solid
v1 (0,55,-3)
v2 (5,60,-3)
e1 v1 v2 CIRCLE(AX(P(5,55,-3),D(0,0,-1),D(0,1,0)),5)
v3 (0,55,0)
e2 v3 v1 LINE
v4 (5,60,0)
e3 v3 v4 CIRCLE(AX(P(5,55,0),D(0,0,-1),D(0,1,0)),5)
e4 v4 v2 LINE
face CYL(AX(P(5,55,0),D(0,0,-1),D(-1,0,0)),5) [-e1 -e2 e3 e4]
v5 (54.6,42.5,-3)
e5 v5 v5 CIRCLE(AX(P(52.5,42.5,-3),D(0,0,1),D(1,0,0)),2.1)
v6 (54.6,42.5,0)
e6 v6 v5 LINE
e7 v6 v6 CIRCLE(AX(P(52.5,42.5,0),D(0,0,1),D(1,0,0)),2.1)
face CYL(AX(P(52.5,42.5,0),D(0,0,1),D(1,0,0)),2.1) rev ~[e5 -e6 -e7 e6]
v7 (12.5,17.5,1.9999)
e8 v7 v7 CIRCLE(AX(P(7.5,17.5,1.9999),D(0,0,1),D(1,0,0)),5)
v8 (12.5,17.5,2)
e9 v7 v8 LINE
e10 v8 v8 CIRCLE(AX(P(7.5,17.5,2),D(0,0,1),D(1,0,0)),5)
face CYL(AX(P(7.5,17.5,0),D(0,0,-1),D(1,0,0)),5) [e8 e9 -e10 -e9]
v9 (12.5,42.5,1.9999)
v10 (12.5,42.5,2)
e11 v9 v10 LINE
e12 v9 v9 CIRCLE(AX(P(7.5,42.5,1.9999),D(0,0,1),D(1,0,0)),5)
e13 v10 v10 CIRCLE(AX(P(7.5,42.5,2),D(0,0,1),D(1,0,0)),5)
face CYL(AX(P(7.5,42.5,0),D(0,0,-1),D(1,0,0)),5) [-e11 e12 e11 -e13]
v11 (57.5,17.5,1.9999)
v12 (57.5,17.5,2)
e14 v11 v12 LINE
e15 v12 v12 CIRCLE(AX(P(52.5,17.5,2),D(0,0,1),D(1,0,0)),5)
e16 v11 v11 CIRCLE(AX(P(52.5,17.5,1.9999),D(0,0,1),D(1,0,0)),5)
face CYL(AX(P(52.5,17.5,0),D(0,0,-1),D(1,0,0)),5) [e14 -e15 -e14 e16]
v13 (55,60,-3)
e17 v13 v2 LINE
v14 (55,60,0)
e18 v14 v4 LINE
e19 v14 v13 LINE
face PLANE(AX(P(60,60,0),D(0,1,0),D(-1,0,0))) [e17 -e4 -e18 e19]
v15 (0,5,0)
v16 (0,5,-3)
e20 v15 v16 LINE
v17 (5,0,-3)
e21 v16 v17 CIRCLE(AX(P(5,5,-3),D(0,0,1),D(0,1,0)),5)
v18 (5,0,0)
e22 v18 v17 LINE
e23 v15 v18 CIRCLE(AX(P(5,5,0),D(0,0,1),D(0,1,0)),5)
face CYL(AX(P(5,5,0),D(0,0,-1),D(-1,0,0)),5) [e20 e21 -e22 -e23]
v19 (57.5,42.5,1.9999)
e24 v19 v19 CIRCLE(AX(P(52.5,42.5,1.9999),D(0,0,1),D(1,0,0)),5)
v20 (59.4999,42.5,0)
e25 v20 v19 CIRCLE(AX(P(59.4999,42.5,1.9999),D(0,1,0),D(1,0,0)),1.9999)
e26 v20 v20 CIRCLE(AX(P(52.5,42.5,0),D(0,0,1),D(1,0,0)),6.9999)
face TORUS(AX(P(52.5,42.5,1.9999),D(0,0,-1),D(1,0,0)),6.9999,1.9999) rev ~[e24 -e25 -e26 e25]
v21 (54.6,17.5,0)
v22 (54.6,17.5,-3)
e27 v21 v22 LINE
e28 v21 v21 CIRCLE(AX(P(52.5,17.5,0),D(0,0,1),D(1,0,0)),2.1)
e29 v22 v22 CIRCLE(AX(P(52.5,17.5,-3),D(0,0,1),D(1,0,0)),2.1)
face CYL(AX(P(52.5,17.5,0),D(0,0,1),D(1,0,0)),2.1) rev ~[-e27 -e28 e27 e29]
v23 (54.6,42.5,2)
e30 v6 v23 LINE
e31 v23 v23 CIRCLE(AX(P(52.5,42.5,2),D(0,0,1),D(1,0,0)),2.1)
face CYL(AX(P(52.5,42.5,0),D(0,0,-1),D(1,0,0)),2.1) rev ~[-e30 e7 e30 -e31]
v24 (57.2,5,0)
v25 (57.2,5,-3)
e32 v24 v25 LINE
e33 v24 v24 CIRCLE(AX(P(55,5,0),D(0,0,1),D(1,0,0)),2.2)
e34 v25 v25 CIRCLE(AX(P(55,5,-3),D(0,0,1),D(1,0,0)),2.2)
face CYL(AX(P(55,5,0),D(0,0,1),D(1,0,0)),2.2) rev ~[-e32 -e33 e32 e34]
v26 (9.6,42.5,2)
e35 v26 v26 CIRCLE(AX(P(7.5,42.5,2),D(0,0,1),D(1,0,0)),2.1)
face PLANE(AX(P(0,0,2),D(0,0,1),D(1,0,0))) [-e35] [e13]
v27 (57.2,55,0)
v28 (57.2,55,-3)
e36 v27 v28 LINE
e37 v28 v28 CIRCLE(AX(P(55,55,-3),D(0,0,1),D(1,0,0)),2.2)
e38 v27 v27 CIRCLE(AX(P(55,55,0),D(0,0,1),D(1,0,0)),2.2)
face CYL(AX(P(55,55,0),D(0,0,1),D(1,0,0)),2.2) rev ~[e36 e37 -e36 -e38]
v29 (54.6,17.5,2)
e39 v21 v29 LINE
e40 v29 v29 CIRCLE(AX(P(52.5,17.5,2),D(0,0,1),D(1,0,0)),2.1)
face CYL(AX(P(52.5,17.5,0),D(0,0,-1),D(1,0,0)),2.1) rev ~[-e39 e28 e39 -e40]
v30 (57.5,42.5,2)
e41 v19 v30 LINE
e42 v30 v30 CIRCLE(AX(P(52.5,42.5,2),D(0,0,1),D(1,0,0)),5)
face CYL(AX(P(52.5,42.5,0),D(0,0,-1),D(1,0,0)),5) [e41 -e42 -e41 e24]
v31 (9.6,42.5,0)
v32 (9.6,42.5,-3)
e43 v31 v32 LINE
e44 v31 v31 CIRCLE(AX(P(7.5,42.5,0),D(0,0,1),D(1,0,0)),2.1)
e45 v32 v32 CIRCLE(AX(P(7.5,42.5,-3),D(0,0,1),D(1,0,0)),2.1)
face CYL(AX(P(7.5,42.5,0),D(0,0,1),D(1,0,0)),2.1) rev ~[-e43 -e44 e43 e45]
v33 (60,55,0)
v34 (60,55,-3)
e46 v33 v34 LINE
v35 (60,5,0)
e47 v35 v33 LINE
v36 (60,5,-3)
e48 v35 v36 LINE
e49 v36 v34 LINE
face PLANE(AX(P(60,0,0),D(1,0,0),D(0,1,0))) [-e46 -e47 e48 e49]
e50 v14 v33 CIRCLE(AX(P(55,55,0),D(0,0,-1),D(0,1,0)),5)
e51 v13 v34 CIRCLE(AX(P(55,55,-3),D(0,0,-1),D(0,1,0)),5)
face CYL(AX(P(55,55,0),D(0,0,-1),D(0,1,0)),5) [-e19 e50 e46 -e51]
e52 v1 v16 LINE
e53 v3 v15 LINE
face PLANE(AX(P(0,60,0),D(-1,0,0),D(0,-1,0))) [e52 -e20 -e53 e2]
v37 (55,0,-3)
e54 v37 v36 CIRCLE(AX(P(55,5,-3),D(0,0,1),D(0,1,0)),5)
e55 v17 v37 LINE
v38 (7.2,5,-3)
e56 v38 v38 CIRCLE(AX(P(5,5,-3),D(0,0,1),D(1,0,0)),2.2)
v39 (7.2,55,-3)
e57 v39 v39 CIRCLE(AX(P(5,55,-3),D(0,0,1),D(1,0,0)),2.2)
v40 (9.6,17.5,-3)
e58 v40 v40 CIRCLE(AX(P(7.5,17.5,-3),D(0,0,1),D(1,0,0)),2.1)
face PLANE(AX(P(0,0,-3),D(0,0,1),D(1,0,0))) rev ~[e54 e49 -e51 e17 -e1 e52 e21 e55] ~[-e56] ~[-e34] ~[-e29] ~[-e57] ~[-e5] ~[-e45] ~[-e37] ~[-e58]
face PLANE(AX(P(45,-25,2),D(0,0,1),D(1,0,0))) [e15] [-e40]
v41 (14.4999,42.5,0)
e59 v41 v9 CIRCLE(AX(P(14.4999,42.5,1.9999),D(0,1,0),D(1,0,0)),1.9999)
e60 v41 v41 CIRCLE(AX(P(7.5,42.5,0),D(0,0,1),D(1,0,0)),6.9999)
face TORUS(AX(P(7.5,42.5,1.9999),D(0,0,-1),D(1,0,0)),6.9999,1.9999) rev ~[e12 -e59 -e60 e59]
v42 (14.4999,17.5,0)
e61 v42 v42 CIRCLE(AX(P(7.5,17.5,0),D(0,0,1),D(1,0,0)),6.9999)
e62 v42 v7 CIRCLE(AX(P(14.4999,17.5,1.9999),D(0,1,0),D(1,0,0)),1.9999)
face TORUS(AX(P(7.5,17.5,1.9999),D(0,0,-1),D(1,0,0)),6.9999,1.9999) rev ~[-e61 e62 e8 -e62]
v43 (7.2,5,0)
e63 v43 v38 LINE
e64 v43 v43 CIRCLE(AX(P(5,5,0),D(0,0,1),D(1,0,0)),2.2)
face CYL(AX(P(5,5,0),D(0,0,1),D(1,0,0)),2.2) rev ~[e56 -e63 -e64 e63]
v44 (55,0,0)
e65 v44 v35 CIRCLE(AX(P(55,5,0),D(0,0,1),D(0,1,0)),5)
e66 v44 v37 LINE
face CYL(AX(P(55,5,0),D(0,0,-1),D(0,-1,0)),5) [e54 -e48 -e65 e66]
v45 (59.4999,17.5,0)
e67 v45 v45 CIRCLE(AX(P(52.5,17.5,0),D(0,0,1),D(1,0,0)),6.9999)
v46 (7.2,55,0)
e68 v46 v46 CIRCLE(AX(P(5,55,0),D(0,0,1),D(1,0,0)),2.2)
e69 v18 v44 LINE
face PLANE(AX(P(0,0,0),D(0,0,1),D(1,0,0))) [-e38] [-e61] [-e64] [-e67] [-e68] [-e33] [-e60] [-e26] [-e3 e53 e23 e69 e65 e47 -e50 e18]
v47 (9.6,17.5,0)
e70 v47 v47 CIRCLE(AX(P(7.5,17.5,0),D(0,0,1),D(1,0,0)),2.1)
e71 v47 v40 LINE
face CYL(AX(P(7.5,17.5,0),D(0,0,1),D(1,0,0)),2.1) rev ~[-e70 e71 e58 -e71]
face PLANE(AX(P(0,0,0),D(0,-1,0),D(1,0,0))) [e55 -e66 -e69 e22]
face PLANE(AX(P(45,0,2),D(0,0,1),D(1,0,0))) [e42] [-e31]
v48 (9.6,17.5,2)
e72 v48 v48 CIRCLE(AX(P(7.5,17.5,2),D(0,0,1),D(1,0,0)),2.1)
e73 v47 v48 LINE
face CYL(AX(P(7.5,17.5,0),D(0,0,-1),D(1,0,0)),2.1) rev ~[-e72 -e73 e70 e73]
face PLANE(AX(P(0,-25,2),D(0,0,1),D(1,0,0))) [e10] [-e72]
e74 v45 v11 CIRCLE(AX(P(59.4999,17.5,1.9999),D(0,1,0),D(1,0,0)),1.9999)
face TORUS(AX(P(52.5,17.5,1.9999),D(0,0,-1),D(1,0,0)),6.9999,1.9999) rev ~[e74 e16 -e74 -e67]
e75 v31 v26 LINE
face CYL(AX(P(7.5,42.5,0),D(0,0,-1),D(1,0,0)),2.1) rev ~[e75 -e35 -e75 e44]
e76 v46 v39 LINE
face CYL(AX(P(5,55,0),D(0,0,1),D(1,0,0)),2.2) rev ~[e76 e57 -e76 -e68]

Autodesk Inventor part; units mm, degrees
ref_plane "YZ Plane" through (0, 0, 0) normal (1, 0, 0) x (0, 1, 0)
ref_plane "XZ Plane" through (0, 0, 0) normal (0, 1, 0) x (-1, 0, 0)
ref_plane "XY Plane" through (0, 0, 0) normal (0, 0, 1) x (1, 0, 0)
sketch "Sketch1" plane through (0, 0, 0) normal (0, 0, 1) x (1, 0, 0)
  line L0 (0, 0) -> (60, 0)
  line L1 (60, 0) -> (60, 60)
  line L2 (60, 60) -> (0, 60)
  line L3 (0, 60) -> (0, 0)
  line L4 (5, 55) -> (55, 55) construction
  line L5 (55, 55) -> (55, 5) construction
  line L6 (55, 5) -> (5, 5) construction
  line L7 (5, 5) -> (5, 55) construction
  circle A0 centre (5, 55) radius 2.2
  circle A1 centre (55, 55) radius 2.2
  circle A2 centre (55, 5) radius 2.2
  circle A3 centre (5, 5) radius 2.2
  line L8 (7.5, 42.5) -> (52.5, 42.5) construction
  line L9 (52.5, 42.5) -> (52.5, 17.5) construction
  line L10 (52.5, 17.5) -> (7.5, 17.5) construction
  line L11 (7.5, 17.5) -> (7.5, 42.5) construction
  circle A4 centre (7.5, 42.5) radius 5
  circle A5 centre (7.5, 42.5) radius 2.1
  dimension "d0" = 60
  dimension "d1" = 60
  dimension "d2" = 50
  dimension "d3" = 50
  dimension "d4" = 5
  dimension "d5" = 5
  dimension "d6" = 4.4
  dimension "d7" = 4.4
  dimension "d8" = 4.4
  dimension "d9" = 4.4
  dimension "d10" = 45
  dimension "d11" = 25
  dimension "d12" = 17.5
  dimension "d13" = 7.5
  dimension "d14" = 10
  dimension "d15" = 4.2
extrude "Extrusion1" add sketch "Sketch1" against normal blind 3 contours L3 L2 L1 L0 | A4 | A5
extrude "Extrusion2" add sketch "Sketch1" along normal blind 2 contours A4
fillet "Fillet1" radius 2 1 edges at (2.5, 42.5, 0)
extrude "Extrusion3" cut sketch "Sketch1" against normal through all contours A5
pattern_sketch "Sketch Driven Pattern1" of "Extrusion2", "Fillet1", "Extrusion3" from (7.5, 42.5, 0) copies at (52.5, 42.5, 0) at (52.5, 17.5, 0) at (7.5, 17.5, 0)
fillet "Fillet2" radius 5 4 edges at (0, 0, -1.5) (60, 0, -1.5) (60, 60, -1.5) (0, 60, -1.5)
equation "\"d4\" = -0.5 * d2 + 0.5 * d0"
equation "\"d5\" = -0.5 * d3 + 0.5 * d1"
equation "\"d12\" = -0.5 * d11 + 0.5 * d1"
equation "\"d13\" = -0.5 * d10 + 0.5 * d0"
properties part number "power_distribution_mount"
